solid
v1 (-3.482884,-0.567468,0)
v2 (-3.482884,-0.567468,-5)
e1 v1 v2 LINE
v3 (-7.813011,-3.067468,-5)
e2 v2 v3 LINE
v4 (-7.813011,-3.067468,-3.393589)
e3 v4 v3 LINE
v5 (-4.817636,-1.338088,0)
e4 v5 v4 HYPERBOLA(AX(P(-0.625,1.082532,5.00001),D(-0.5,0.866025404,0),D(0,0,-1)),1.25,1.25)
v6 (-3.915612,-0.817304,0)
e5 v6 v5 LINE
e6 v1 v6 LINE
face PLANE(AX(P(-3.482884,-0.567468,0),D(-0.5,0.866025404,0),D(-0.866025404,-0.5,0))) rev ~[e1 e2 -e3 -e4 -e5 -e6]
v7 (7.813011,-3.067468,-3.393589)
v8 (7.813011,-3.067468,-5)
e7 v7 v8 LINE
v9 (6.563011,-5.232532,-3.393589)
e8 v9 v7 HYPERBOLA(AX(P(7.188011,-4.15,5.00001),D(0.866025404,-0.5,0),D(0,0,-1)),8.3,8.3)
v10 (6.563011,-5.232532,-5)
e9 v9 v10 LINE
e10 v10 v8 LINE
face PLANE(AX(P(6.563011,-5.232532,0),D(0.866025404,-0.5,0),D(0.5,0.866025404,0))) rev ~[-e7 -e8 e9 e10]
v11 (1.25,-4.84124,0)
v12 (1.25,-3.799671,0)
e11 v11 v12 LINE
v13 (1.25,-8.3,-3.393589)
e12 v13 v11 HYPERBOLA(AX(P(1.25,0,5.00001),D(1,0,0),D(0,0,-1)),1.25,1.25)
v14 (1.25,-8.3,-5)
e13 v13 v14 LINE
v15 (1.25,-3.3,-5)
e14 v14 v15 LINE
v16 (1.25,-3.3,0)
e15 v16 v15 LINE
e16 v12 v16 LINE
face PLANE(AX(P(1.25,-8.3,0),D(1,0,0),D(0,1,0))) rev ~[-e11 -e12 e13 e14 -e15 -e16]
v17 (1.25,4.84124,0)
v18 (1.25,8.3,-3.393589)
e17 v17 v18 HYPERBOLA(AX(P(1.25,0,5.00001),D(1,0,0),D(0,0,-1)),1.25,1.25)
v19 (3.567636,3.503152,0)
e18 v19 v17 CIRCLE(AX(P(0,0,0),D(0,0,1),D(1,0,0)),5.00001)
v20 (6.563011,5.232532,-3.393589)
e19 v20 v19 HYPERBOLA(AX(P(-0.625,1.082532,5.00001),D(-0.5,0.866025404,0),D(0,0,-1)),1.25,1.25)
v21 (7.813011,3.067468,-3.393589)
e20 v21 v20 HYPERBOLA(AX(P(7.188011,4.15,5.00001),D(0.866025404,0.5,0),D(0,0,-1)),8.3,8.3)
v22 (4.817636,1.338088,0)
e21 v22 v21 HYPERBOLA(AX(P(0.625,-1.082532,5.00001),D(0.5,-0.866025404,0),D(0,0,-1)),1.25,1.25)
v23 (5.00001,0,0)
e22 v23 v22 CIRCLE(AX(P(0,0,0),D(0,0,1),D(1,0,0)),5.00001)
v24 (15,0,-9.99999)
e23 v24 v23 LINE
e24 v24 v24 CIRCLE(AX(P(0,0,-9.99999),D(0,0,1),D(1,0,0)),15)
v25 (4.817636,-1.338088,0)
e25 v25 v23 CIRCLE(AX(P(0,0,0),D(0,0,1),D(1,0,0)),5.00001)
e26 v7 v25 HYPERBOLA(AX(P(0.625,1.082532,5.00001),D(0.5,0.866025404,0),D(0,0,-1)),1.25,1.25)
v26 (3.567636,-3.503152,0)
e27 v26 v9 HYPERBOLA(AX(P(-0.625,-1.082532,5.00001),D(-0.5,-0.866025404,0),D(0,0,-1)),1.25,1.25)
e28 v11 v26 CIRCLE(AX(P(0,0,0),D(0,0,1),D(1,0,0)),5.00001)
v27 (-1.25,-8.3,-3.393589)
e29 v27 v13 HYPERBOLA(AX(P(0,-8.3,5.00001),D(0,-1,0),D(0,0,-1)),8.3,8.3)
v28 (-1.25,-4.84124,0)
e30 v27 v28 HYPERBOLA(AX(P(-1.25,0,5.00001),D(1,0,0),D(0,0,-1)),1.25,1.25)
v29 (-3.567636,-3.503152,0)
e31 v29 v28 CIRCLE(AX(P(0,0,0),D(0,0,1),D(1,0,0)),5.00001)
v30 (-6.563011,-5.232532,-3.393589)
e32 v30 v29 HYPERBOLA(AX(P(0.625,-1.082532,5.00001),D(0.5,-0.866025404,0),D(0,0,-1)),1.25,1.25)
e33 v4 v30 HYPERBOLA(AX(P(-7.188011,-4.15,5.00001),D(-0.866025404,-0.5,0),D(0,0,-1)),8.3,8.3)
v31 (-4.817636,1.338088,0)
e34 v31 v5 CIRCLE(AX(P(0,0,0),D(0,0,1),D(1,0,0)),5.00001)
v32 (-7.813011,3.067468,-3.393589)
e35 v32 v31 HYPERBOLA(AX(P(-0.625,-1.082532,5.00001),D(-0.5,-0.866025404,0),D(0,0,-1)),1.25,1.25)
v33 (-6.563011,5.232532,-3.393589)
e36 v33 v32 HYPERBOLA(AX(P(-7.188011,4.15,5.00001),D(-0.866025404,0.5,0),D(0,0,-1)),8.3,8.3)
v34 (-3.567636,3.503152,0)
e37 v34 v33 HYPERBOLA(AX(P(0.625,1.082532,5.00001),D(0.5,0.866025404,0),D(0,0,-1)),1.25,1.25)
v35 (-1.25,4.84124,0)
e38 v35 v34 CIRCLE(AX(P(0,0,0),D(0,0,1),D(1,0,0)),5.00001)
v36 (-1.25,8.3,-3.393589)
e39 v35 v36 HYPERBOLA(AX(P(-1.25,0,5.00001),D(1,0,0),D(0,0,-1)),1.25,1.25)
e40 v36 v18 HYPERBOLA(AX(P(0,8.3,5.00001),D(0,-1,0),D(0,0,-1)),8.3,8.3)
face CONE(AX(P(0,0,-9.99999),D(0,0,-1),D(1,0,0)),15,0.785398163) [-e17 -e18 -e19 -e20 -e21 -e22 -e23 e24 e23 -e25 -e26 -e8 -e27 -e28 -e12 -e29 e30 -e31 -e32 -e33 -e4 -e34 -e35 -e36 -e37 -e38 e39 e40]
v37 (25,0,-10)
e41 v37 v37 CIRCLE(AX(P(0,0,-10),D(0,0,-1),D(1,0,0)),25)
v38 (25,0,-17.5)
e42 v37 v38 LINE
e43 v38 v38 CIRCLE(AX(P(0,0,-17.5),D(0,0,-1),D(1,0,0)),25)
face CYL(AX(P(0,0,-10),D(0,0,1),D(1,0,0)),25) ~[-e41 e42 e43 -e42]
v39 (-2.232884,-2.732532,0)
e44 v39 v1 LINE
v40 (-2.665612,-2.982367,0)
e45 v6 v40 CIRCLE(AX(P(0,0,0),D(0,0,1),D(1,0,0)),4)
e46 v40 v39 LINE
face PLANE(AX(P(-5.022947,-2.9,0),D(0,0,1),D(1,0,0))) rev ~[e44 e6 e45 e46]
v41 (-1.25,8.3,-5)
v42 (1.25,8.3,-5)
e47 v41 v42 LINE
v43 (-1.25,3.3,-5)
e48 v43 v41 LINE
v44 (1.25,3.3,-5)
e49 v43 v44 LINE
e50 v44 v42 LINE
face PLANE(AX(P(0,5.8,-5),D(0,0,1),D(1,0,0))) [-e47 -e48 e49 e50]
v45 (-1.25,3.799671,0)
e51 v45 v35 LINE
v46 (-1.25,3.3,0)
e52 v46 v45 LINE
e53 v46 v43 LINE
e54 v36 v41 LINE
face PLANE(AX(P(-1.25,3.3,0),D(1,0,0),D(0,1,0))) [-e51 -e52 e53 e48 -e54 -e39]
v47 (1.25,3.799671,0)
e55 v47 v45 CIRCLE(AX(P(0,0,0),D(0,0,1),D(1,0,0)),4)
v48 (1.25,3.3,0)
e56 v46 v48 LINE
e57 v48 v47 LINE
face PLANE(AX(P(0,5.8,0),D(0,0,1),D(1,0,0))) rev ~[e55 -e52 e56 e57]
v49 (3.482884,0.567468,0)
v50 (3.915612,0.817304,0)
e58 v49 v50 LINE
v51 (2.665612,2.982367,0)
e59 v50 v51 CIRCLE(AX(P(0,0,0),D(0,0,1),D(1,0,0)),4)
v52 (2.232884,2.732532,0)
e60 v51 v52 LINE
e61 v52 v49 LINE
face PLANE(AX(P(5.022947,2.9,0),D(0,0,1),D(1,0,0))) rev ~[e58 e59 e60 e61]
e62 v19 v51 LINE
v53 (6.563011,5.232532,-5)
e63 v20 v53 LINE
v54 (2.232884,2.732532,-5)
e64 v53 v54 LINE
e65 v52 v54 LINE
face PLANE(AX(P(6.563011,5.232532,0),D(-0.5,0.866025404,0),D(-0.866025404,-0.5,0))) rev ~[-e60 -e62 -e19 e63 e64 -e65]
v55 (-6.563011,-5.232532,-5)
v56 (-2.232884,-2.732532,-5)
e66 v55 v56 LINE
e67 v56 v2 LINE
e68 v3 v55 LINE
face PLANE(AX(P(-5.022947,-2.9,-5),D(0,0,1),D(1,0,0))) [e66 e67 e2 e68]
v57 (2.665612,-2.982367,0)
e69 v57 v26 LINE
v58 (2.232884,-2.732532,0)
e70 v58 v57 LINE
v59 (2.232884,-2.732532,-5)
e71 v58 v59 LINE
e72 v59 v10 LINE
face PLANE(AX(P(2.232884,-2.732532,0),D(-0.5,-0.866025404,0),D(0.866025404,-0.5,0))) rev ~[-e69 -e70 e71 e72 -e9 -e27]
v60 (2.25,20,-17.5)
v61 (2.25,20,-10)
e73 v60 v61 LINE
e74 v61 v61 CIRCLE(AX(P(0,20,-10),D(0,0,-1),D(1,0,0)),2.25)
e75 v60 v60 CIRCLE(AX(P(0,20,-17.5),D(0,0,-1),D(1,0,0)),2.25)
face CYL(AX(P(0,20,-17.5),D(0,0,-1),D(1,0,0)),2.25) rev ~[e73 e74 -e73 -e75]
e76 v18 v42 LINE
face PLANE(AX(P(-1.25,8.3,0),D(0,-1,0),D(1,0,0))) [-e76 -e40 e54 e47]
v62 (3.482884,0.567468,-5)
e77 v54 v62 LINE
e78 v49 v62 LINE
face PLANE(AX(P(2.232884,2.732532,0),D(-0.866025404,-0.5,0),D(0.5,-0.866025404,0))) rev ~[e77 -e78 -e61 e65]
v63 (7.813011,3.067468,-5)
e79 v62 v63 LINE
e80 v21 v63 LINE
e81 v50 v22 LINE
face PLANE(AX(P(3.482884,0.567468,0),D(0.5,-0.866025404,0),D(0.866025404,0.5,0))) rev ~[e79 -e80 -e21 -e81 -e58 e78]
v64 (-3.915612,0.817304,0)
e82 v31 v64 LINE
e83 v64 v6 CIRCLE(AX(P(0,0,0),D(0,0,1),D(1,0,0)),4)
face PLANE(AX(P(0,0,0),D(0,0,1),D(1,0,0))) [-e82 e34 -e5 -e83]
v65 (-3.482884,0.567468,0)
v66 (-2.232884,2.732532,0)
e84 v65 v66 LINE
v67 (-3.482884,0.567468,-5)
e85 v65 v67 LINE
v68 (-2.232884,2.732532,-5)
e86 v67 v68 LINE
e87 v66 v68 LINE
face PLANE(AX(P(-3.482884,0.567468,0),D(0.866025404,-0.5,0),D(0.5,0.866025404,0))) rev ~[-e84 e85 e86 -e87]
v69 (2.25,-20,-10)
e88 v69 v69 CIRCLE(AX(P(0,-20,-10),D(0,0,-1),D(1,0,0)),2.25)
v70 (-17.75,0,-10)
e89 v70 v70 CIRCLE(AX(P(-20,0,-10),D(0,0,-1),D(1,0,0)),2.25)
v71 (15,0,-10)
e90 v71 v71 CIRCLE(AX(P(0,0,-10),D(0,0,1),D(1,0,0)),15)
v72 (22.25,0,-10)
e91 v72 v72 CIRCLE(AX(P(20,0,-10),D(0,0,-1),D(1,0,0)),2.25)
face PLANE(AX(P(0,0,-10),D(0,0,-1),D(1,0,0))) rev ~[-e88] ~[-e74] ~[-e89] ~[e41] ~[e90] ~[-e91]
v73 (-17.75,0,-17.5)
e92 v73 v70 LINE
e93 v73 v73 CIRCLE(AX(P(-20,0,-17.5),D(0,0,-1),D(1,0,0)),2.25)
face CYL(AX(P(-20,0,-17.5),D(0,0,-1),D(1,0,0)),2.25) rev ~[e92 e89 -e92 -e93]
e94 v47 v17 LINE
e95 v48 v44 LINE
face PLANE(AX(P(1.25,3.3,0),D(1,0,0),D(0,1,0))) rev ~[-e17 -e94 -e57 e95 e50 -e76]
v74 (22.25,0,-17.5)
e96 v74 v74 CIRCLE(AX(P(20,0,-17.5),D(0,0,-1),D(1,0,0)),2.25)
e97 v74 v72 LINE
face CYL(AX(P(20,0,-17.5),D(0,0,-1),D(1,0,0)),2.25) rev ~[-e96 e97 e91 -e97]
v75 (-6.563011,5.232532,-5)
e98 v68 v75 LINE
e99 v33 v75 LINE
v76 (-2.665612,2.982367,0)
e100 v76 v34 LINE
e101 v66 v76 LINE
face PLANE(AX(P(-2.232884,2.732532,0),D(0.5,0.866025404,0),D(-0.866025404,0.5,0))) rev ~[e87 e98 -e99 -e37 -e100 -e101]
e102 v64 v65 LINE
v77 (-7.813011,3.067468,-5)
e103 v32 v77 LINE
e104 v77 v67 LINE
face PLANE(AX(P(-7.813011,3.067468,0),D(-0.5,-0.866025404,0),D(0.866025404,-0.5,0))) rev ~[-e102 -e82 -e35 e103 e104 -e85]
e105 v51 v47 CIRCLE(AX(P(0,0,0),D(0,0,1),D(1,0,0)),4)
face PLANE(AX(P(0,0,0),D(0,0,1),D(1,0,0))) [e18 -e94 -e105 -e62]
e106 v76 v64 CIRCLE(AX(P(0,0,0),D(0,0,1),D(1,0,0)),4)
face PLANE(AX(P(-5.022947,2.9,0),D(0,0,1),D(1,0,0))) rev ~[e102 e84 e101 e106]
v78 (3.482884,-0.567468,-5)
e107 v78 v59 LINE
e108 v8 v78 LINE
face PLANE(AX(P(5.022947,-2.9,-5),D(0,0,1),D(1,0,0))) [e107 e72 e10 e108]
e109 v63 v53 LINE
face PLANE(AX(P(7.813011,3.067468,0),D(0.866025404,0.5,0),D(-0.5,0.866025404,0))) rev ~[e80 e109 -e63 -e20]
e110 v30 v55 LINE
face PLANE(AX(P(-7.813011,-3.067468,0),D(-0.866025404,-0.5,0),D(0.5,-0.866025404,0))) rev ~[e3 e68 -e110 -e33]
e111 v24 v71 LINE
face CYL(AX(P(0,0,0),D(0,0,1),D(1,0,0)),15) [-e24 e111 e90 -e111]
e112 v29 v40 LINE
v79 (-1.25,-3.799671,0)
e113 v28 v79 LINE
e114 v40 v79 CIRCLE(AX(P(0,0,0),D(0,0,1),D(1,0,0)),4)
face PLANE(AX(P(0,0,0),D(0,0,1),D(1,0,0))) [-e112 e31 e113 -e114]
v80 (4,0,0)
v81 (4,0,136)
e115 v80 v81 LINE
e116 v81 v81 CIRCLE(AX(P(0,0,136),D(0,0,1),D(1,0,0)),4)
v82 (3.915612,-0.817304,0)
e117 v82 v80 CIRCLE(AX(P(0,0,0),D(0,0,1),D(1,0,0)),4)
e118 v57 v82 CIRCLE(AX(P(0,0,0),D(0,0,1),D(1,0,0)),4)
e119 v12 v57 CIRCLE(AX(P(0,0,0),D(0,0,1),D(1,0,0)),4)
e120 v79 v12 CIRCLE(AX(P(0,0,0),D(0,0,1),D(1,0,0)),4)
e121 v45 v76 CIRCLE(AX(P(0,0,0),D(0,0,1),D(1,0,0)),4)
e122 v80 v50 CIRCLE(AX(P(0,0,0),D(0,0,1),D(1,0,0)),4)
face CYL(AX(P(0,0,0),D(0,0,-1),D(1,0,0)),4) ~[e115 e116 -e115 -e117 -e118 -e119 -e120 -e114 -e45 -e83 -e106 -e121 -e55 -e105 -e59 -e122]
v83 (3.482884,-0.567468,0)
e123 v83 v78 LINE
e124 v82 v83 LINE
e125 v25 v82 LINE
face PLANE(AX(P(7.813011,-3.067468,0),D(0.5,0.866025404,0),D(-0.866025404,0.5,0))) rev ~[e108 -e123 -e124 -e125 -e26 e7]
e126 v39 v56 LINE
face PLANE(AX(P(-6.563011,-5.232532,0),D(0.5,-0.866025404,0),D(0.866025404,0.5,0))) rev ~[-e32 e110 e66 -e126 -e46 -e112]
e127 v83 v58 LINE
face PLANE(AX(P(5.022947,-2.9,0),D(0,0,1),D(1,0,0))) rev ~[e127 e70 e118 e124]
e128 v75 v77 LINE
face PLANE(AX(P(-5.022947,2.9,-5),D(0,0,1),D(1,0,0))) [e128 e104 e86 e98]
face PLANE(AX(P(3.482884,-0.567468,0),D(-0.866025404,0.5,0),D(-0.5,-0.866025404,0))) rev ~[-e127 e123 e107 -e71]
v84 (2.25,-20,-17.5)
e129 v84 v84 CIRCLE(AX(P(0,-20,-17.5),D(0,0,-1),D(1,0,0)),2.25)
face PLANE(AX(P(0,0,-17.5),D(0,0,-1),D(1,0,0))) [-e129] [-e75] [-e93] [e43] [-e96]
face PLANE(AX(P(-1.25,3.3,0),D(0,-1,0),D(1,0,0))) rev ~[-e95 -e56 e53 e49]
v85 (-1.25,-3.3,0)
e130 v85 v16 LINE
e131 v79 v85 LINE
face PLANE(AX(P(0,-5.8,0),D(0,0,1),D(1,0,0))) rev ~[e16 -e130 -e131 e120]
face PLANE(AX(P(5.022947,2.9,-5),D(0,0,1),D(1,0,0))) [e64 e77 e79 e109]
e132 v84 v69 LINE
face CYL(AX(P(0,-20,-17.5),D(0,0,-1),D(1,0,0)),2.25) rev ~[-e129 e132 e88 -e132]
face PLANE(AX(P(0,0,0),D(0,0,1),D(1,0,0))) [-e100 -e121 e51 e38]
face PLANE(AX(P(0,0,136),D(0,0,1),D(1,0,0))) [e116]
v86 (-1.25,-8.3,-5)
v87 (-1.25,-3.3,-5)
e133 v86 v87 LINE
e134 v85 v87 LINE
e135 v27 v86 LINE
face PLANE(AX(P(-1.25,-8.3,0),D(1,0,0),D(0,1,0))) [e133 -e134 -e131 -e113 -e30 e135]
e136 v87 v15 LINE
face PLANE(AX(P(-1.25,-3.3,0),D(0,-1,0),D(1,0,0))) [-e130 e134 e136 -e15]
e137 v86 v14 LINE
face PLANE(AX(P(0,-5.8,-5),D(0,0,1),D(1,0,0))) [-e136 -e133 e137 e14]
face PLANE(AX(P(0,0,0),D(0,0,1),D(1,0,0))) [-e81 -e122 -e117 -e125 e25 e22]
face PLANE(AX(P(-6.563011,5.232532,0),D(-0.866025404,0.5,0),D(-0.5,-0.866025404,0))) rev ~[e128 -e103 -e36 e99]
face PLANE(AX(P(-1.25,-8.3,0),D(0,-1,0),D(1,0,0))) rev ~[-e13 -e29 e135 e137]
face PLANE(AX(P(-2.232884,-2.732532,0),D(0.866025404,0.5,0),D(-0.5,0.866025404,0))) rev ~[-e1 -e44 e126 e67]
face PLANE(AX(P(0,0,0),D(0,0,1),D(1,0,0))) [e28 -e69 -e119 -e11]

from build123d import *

# Parameters (mm, degrees)
F0_R      = 4
F1_DEPTH  = 136
F2_R      = 15
F3_DEPTH  = 10
F4_SIZE   = 9.99999
F5_R      = 25
F5_R_2    = 15
F6_DEPTH  = 7.5
F7_R      = 2.25
F8_DEPTH  = 153.501
F9_W      = 2.5
F9_H      = 5
F10_DEPTH = 5


# Not quite as in the source:
# - a fillet or chamfer is up to 0.001 mm smaller than in the source, because OpenCascade refuses the exact size


with BuildPart() as f1:
    # F0 (on Top) → F1 (new body)
    with BuildSketch(Plane.XY):
        Circle(F0_R)
    extrude(amount=F1_DEPTH)

    # F2 (on Top) → F3 (join)
    with BuildSketch(Plane.XY):
        Circle(F2_R)
    extrude(amount=-F3_DEPTH)

    # F4 (size 10 in the source; OpenCascade refuses exactly that, so slightly less here)
    f4_edges = [f1.edges().sort_by_distance(p)[0] for p in [
        (-15, 0, 0),
    ]]
    chamfer(f4_edges, length=F4_SIZE)

    # F5 (on face) → F6 (join)
    with BuildSketch(Plane(origin=(0, 0, -10), x_dir=(1, 0, 0), z_dir=(0, 0, -1))):
        Circle(F5_R)
        Circle(F5_R_2, mode=Mode.SUBTRACT)
        Circle(F5_R_2)
    extrude(amount=F6_DEPTH)

    # F7 (on face) → F8 (cut, through all)
    with BuildSketch(Plane(origin=(0, 0, -17.5), x_dir=(1, 0, 0), z_dir=(0, 0, -1))):
        with Locations((-20, 0)):
            Circle(F7_R)
        with Locations((0, 20)):
            Circle(F7_R)
        with Locations((20, 0)):
            Circle(F7_R)
        with Locations((0, -20)):
            Circle(F7_R)
    extrude(amount=-F8_DEPTH, mode=Mode.SUBTRACT)

    # F9 (on face) → F10 (cut)
    with BuildSketch(Plane.XY):
        with Locations((0, 5.8)):
            Rectangle(F9_W, F9_H)
        Polygon((-2.2328838325, 2.7325317547), (-6.5630108514, 5.2325317547), (-7.8130108514, 3.0674682453), (-3.4828838325, 0.5674682453), align=None)
        Polygon((-3.4828838325, -0.5674682453), (-7.8130108514, -3.0674682453), (-6.5630108514, -5.2325317547), (-2.2328838325, -2.7325317547), align=None)
        with Locations((0, -5.8)):
            Rectangle(F9_W, F9_H)
        Polygon((2.2328838325, -2.7325317547), (6.5630108514, -5.2325317547), (7.8130108514, -3.0674682453), (3.4828838325, -0.5674682453), align=None)
        Polygon((3.4828838325, 0.5674682453), (7.8130108514, 3.0674682453), (6.5630108514, 5.2325317547), (2.2328838325, 2.7325317547), align=None)
    extrude(amount=-F10_DEPTH, mode=Mode.SUBTRACT)


solid = f1.part
